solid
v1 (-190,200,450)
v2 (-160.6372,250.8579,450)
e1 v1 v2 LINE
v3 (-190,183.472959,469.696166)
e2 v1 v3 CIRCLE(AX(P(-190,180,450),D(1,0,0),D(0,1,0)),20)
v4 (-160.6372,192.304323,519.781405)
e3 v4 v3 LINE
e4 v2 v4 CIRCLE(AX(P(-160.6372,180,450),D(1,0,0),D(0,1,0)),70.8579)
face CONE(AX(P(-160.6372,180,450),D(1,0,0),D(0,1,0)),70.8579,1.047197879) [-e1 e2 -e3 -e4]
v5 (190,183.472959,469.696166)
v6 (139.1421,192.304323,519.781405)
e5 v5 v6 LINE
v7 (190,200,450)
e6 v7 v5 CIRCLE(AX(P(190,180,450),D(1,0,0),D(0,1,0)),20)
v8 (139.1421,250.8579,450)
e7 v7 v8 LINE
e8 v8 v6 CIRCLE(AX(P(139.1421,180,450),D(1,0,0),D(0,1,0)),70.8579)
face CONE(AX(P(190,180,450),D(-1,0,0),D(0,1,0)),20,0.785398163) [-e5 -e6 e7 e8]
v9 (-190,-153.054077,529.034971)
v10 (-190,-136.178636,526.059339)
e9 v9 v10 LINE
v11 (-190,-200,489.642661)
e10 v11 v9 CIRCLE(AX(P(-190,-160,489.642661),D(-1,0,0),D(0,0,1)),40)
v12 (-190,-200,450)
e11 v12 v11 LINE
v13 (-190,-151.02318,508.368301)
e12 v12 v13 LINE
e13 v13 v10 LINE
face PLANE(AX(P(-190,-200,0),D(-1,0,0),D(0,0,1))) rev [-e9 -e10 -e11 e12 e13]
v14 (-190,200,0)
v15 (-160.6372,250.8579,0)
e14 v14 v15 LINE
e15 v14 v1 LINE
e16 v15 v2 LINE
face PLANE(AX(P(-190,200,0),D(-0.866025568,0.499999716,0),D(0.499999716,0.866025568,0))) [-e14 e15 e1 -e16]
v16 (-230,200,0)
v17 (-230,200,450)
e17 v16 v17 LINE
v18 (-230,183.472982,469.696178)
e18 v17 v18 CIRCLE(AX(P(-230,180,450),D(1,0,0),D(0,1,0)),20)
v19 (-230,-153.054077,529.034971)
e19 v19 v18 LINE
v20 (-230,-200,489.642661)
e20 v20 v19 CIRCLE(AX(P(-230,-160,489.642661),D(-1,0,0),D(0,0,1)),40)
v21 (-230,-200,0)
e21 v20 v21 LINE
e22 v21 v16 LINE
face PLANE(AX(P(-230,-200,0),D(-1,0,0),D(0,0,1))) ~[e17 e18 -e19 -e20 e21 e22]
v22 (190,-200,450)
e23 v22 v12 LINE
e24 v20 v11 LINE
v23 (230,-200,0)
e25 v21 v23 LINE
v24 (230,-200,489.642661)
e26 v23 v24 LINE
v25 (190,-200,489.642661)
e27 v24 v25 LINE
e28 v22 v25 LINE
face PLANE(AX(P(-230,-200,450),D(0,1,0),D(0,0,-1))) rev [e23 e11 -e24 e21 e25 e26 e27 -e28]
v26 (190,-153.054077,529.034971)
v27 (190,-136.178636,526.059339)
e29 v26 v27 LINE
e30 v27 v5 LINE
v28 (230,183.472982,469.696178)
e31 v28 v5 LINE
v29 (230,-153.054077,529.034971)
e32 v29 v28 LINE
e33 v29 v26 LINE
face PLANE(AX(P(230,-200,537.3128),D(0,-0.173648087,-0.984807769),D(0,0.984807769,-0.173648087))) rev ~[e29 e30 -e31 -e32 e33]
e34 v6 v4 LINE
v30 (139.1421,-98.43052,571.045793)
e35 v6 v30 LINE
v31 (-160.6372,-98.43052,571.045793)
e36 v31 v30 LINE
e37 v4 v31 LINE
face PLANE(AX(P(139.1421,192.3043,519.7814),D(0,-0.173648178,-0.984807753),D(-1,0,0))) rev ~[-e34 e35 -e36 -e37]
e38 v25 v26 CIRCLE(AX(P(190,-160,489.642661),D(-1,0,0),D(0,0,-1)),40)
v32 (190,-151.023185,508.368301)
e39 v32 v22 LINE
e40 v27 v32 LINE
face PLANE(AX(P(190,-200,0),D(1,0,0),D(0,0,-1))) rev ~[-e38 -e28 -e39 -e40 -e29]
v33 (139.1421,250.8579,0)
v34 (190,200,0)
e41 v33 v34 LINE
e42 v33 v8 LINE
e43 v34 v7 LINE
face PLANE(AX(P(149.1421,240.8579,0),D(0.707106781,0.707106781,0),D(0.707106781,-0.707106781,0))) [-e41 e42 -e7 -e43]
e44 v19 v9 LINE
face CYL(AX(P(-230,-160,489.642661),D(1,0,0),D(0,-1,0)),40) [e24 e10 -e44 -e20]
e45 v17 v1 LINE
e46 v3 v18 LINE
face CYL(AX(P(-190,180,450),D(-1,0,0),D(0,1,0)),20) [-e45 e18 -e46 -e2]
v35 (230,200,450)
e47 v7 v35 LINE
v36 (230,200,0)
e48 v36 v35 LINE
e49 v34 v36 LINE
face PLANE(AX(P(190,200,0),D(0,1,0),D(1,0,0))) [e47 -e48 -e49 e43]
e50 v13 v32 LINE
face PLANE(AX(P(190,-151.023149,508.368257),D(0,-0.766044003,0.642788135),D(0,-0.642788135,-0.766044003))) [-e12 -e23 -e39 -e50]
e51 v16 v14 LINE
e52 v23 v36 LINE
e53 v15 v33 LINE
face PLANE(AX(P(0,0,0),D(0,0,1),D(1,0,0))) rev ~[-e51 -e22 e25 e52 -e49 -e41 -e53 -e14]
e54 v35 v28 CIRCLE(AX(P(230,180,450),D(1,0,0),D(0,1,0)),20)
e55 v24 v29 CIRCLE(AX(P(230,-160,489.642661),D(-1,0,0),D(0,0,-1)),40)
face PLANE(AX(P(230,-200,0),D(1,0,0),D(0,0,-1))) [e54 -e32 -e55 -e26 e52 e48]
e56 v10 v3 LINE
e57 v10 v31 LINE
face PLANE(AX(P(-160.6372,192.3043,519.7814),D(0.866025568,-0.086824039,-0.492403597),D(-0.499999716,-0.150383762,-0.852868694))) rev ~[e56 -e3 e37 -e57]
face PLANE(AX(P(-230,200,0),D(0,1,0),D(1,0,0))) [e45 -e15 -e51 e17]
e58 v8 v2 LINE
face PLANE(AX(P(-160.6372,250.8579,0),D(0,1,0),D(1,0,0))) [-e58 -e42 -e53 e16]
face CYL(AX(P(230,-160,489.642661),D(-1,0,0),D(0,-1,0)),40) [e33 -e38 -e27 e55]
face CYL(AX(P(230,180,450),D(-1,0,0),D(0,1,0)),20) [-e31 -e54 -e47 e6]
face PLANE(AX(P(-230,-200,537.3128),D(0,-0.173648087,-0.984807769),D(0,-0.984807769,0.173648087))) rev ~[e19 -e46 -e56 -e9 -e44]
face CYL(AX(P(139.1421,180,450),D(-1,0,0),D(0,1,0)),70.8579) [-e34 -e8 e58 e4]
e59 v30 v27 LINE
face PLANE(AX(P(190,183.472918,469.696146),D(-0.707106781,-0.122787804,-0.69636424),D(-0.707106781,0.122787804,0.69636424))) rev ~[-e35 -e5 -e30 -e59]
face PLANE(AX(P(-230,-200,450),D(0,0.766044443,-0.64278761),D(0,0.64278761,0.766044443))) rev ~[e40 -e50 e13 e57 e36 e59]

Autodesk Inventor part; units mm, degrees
ref_plane "YZ Plane" through (0, 0, 0) normal (1, 0, 0) x (0, 1, 0)
sketch "Sketch1" plane through (0, 0, 0) normal (0, 0, 1) x (1, 0, 0)
  line L0 (230, -200) -> (-230, -200)
  line L1 (-230, -200) -> (-230, 200)
  line L2 (-230, 200) -> (230, 200)
  line L3 (230, 200) -> (230, -200)
  line L4 (230, -200) -> (-230, 200) construction
  line L5 (-230, -200) -> (230, 200) construction
  line L6 (-190, 200) -> (-160.6372, 250.8579)
  line L7 (-160.6372, 250.8579) -> (139.1421, 250.8579)
  line L8 (139.1421, 250.8579) -> (190, 200)
  line L9 (139.1421, 250.8579) -> (122.8634, 211.5574) construction
  line L10 (135, 250.8579) -> (135, 240.8579) construction
  line L11 (230, 200) -> (190, 200)
  line L12 (190, 200) -> (190, 160)
  line L13 (190, 160) -> (230, 160)
  line L14 (230, 160) -> (230, 200)
  line L15 (-150, 110) -> (150, 110)
  line L16 (150, 110) -> (150, -140)
  line L17 (150, -140) -> (-150, -140)
  line L18 (-150, -140) -> (-150, 110)
  line L19 (-230, -200) -> (-190, -200)
  line L20 (-190, -200) -> (-190, -160)
  line L21 (-190, -160) -> (-230, -160)
  line L22 (-230, -160) -> (-230, -200)
  line L23 (230, -200) -> (190, -200)
  line L24 (190, -200) -> (190, -160)
  line L25 (190, -160) -> (230, -160)
  line L26 (230, -160) -> (230, -200)
  line L27 (-230, 200) -> (-190, 200)
  line L28 (-190, 200) -> (-190, 160)
  line L29 (-190, 160) -> (-230, 160)
  line L30 (-230, 160) -> (-230, 200)
  line L31 (-40, 200) -> (40, 200)
  line L32 (40, 200) -> (40, 160)
  line L33 (40, 160) -> (-40, 160)
  line L34 (-40, 160) -> (-40, 200)
  line L35 (125, 250.8579) -> (135, 250.8579)
  line L36 (135, 250.8579) -> (135, 230.8579)
  line L37 (135, 230.8579) -> (125, 230.8579)
  line L38 (125, 230.8579) -> (125, 250.8579)
  line L39 (149.1421, 240.8579) -> (142.0711, 247.9289)
  line L40 (142.0711, 247.9289) -> (127.9289, 233.7868)
  line L41 (127.9289, 233.7868) -> (134.2929, 227.4228)
  line L42 (135.7071, 227.4228) -> (149.1421, 240.8579)
  line L43 (135, 200) -> (132, 200)
  line L44 (132, 200) -> (132, 239)
  line L45 (132, 239) -> (135, 239)
  line L46 (135, 239) -> (135, 200)
  line L47 (135, 200) -> (95, 200)
  line L48 (95, 200) -> (95, 180)
  line L49 (95, 180) -> (135, 180)
  line L50 (135, 180) -> (135, 200)
  line L51 (-222, 80) -> (-132, 80)
  line L52 (-132, 80) -> (-132, -140)
  line L53 (-132, -140) -> (-222, -140)
  line L54 (-222, -140) -> (-222, 80)
  circle A0 centre (-112, -40) radius 100
  circle A1 centre (112, -40) radius 100
  line L55 (-230, -40) -> (230, -40) construction
  line L56 (-112, -40) -> (112, -40)
  arc A2 (134.2929, 227.4228) -> (135.7071, 227.4228) centre (135, 228.1299) ccw
  point P0 (0, 0)
  point P1 (0, 110)
  point P2 (0, 200)
  point P3 (135, 226.7157)
  point P4 (0, -40)
  dimension "d0" = 460
  dimension "d1" = 400
  dimension "d2" = 40
  dimension "d3" = 40
  dimension "d4" = 120
  dimension "d5" = 135
  dimension "d30" = 67.5
  dimension "d32" = 10
  dimension "d34" = 50.8579
  dimension "d35" = 40
  dimension "d36" = 40
  dimension "d37" = 300
  dimension "d38" = 250
  dimension "d39" = 60
  dimension "d40" = 40
  dimension "d41" = 40
  dimension "d42" = 40
  dimension "d43" = 40
  dimension "d44" = 40
  dimension "d45" = 40
  dimension "d46" = 80
  dimension "d47" = 40
  dimension "d48" = 10
  dimension "d50" = 10
  dimension "d51" = 3
  dimension "d52" = 39
  dimension "d53" = 40
  dimension "d54" = 20
  dimension "d55" = 55
  dimension "d56" = 105
  dimension "d57" = 90
  dimension "d58" = 220
  dimension "d59" = 8
  dimension "d60" = 20
  dimension "d61" = 55
  dimension "d63" = 200
  dimension "d64" = 160
  dimension "d65" = 118
  dimension "d66" = 1
extrude "Extrusion1" add sketch "Sketch1" along normal blind 450 contours L0 L24 L25 L3 | L0 L20 L21 L1 L29 L28 L2 L34 L33 L32 L48 L49 L50 L12 L13 L3 L25 L24 | L0 L1 L21 L20 | L13 L12 L2 L3 | L2 L46 A2 L42 L8 | L1 L2 L28 L29 | L50 L49 L48 L2 | L2 L44 L41 A2 L46 | L42 A2 L46 L36 L40 L8 | L2 L6 L7 L38 L37 L41 L44 | A2 L41 L44 L37 L46 | L40 L36 L7 L8 | L41 L37 L44 | L37 L44 L40 L45 L36 | L40 L45 L44 L41 L37 L38 L7 L36 | L36 L45 L40 | L2 L32 L33 L34 | L41 L40 L44 L37 | L40 L44 L45 | L15 L16 A1 L56 A0 L52 L51 L18 | L51 L52 A0 L18 | L18 A0 L53 L54 L51 | A1 L16 | L16 A1 | A0 L52 L18 | L18 A0 | L16 L17 A1 | A1 L17 A0 L56 | A0 L52 L17 L18 | A0 L52 | A0 L17 L52
sketch "Sketch2" plane through (0, 0, 450) normal (0, 0, 1) x (1, 0, 0)
  line L0 (-160.6372, 250.8579) -> (-190, 200) projected
  line L1 (-190, 200) -> (-230, 200) projected
  line L2 (-230, 200) -> (-230, -200) projected
  line L3 (-230, -200) -> (230, -200) projected
  line L4 (230, -200) -> (230, 200) projected
  line L5 (230, 200) -> (190, 200) projected
  line L6 (190, 200) -> (139.1421, 250.8579) projected
  line L7 (139.1421, 250.8579) -> (-160.6372, 250.8579) projected
  line L8 (230, 180) -> (-230, 180)
  point P0 (0, 0)
  dimension "d9" = 20
revolve "Revolution1" add sketch "Sketch2" angle 80 about axis through (230, 180, 450) along (1, 0, 0) contours L7 L6 L5 L4 L8 L2 L1 L0
sketch "Sketch3" plane through (-230, 180, 450) normal (0, -0.9848078, 0.1736482) x (1, 0, 0)
  line L0 (0, 20) -> (0, 0) projected
  line L1 (460, 0) -> (0, 0) projected
  line L2 (460, 0) -> (460, 20) projected
  line L3 (460, 20) -> (420, 20) projected
  line L4 (420, 20) -> (369.1421, 70.8579) projected
  line L5 (369.1421, 70.8579) -> (69.3628, 70.8579) projected
  line L6 (69.3628, 70.8579) -> (40, 20) projected
  line L7 (40, 20) -> (0, 20) projected
  point P0 (230, -474.4202)
ref_plane "Work Plane4" through (-230, -208.6603, 455) normal (0, 0.8660254, -0.5) x (1, 0, 0)
ref_plane "Work Plane3" through (-230, -200, 450) normal (0, 0.8660254, -0.5) x (1, 0, 0)
sketch "Sketch7" plane through (230, -200, 0) normal (1, 0, 0) x (0, 0, -1)
  line L0 (0, 0) -> (0, 400) projected
  line L1 (0, 400) -> (-450, 400) projected
  arc A0 (-450, 400) -> (-469.6962, 383.473) centre (-450, 380) ccw projected
  line L2 (-450, 380) -> (-469.6962, 383.473) projected
  line L3 (-450, 0) -> (-450, 380) projected
  line L4 (0, 0) -> (-450, 0) projected
  line L5 (-450, 0) -> (-537.3128, 0)
  line L6 (-537.3128, 0) -> (-469.6962, 383.473)
  arc A1 (-450, 400) -> (-469.6962, 383.473) centre (-450, 380) ccw projected
  line L7 (-450, 380) -> (-469.6962, 383.473) projected
  point P0 (0, 200)
extrude "Extrusion7" add sketch "Sketch7" against normal blind 40 contours L5 L6 L2 L3
fillet "Fillet6" radius 40 1 edges at (210, -200, 537.3128)
mirror "Mirror1" about plane through (0, 0, 0) normal (1, 0, 0) of "Extrusion7", "Fillet6"
ref_plane "Work Plane5" through (-230, -200, 450) normal (0, 0.7660444, -0.6427876) x (1, 0, 0)
sketch "Sketch9" plane through (-160.6372, 192.3043, 519.7814) normal (0, -0.9848078, 0.1736482) x (1, 0, 0)
  line L0 (-29.3628, -50.8579) -> (-29.3628, -70.8579) projected
  line L1 (350.6372, -70.8579) -> (-29.3628, -70.8579) projected
  line L2 (350.6372, -70.8579) -> (350.6372, -50.8579) projected
  line L3 (350.6372, -50.8579) -> (299.7793, 0) projected
  line L4 (299.7793, 0) -> (0, 0) projected
  line L5 (0, 0) -> (-29.3628, -50.8579) projected
  point P0 (160.6372, -545.278)
extrude "Extrusion8" add sketch "Sketch9" along normal up to surface surface through (-230, -200, 450) normal (0, 0.7660444, -0.6427876)
sketch "Sketch11" plane through (190, -200, 0) normal (-1, 0, 0) x (0, 0, 1)
  line L0 (526.0594, 63.8214) -> (508.3683, 48.9768) projected
  line L1 (508.3683, 48.9768) -> (450, 380) projected
  line L2 (450, 0) -> (450, 380) projected
  line L3 (450, 0) -> (489.6426, 0) projected
  arc A0 (489.6426, 0) -> (529.035, 46.9459) centre (489.6426, 40) ccw projected
  line L4 (529.035, 46.9459) -> (526.0594, 63.8214) projected
  line L5 (508.4341, 49.0321) -> (450, 0)
  point P0 (0, 200)
  point P1 (508.3683, 48.9768)
extrude "Extrusion9" add sketch "Sketch11" along normal up to next contours L5 L2 L1
sketch "Sketch6" plane through (-230, -200, 0) normal (-1, 0, 0) x (0, 0, 1)
  line L0 (0, 400) -> (0, 0) projected
  line L1 (0, 0) -> (450, 0) projected
  line L2 (450, 380) -> (450, 0) projected
  line L3 (450, 380) -> (512.6612, 24.6305) projected
  line L4 (531.0933, 35.2723) -> (512.6612, 24.6305) projected
  line L5 (469.6962, 383.473) -> (531.0933, 35.2723) projected
  arc A0 (469.6962, 383.473) -> (450, 400) centre (450, 380) ccw projected
  line L6 (0, 400) -> (450, 400) projected
  line L7 (512.6612, 24.6305) -> (470, 0)
  line L8 (470, 0) -> (450, 0)
  point P0 (0, 200)
equation "\"d30\" = 0.5 * d5"
properties part number "RevII Printer Envelope Study"
